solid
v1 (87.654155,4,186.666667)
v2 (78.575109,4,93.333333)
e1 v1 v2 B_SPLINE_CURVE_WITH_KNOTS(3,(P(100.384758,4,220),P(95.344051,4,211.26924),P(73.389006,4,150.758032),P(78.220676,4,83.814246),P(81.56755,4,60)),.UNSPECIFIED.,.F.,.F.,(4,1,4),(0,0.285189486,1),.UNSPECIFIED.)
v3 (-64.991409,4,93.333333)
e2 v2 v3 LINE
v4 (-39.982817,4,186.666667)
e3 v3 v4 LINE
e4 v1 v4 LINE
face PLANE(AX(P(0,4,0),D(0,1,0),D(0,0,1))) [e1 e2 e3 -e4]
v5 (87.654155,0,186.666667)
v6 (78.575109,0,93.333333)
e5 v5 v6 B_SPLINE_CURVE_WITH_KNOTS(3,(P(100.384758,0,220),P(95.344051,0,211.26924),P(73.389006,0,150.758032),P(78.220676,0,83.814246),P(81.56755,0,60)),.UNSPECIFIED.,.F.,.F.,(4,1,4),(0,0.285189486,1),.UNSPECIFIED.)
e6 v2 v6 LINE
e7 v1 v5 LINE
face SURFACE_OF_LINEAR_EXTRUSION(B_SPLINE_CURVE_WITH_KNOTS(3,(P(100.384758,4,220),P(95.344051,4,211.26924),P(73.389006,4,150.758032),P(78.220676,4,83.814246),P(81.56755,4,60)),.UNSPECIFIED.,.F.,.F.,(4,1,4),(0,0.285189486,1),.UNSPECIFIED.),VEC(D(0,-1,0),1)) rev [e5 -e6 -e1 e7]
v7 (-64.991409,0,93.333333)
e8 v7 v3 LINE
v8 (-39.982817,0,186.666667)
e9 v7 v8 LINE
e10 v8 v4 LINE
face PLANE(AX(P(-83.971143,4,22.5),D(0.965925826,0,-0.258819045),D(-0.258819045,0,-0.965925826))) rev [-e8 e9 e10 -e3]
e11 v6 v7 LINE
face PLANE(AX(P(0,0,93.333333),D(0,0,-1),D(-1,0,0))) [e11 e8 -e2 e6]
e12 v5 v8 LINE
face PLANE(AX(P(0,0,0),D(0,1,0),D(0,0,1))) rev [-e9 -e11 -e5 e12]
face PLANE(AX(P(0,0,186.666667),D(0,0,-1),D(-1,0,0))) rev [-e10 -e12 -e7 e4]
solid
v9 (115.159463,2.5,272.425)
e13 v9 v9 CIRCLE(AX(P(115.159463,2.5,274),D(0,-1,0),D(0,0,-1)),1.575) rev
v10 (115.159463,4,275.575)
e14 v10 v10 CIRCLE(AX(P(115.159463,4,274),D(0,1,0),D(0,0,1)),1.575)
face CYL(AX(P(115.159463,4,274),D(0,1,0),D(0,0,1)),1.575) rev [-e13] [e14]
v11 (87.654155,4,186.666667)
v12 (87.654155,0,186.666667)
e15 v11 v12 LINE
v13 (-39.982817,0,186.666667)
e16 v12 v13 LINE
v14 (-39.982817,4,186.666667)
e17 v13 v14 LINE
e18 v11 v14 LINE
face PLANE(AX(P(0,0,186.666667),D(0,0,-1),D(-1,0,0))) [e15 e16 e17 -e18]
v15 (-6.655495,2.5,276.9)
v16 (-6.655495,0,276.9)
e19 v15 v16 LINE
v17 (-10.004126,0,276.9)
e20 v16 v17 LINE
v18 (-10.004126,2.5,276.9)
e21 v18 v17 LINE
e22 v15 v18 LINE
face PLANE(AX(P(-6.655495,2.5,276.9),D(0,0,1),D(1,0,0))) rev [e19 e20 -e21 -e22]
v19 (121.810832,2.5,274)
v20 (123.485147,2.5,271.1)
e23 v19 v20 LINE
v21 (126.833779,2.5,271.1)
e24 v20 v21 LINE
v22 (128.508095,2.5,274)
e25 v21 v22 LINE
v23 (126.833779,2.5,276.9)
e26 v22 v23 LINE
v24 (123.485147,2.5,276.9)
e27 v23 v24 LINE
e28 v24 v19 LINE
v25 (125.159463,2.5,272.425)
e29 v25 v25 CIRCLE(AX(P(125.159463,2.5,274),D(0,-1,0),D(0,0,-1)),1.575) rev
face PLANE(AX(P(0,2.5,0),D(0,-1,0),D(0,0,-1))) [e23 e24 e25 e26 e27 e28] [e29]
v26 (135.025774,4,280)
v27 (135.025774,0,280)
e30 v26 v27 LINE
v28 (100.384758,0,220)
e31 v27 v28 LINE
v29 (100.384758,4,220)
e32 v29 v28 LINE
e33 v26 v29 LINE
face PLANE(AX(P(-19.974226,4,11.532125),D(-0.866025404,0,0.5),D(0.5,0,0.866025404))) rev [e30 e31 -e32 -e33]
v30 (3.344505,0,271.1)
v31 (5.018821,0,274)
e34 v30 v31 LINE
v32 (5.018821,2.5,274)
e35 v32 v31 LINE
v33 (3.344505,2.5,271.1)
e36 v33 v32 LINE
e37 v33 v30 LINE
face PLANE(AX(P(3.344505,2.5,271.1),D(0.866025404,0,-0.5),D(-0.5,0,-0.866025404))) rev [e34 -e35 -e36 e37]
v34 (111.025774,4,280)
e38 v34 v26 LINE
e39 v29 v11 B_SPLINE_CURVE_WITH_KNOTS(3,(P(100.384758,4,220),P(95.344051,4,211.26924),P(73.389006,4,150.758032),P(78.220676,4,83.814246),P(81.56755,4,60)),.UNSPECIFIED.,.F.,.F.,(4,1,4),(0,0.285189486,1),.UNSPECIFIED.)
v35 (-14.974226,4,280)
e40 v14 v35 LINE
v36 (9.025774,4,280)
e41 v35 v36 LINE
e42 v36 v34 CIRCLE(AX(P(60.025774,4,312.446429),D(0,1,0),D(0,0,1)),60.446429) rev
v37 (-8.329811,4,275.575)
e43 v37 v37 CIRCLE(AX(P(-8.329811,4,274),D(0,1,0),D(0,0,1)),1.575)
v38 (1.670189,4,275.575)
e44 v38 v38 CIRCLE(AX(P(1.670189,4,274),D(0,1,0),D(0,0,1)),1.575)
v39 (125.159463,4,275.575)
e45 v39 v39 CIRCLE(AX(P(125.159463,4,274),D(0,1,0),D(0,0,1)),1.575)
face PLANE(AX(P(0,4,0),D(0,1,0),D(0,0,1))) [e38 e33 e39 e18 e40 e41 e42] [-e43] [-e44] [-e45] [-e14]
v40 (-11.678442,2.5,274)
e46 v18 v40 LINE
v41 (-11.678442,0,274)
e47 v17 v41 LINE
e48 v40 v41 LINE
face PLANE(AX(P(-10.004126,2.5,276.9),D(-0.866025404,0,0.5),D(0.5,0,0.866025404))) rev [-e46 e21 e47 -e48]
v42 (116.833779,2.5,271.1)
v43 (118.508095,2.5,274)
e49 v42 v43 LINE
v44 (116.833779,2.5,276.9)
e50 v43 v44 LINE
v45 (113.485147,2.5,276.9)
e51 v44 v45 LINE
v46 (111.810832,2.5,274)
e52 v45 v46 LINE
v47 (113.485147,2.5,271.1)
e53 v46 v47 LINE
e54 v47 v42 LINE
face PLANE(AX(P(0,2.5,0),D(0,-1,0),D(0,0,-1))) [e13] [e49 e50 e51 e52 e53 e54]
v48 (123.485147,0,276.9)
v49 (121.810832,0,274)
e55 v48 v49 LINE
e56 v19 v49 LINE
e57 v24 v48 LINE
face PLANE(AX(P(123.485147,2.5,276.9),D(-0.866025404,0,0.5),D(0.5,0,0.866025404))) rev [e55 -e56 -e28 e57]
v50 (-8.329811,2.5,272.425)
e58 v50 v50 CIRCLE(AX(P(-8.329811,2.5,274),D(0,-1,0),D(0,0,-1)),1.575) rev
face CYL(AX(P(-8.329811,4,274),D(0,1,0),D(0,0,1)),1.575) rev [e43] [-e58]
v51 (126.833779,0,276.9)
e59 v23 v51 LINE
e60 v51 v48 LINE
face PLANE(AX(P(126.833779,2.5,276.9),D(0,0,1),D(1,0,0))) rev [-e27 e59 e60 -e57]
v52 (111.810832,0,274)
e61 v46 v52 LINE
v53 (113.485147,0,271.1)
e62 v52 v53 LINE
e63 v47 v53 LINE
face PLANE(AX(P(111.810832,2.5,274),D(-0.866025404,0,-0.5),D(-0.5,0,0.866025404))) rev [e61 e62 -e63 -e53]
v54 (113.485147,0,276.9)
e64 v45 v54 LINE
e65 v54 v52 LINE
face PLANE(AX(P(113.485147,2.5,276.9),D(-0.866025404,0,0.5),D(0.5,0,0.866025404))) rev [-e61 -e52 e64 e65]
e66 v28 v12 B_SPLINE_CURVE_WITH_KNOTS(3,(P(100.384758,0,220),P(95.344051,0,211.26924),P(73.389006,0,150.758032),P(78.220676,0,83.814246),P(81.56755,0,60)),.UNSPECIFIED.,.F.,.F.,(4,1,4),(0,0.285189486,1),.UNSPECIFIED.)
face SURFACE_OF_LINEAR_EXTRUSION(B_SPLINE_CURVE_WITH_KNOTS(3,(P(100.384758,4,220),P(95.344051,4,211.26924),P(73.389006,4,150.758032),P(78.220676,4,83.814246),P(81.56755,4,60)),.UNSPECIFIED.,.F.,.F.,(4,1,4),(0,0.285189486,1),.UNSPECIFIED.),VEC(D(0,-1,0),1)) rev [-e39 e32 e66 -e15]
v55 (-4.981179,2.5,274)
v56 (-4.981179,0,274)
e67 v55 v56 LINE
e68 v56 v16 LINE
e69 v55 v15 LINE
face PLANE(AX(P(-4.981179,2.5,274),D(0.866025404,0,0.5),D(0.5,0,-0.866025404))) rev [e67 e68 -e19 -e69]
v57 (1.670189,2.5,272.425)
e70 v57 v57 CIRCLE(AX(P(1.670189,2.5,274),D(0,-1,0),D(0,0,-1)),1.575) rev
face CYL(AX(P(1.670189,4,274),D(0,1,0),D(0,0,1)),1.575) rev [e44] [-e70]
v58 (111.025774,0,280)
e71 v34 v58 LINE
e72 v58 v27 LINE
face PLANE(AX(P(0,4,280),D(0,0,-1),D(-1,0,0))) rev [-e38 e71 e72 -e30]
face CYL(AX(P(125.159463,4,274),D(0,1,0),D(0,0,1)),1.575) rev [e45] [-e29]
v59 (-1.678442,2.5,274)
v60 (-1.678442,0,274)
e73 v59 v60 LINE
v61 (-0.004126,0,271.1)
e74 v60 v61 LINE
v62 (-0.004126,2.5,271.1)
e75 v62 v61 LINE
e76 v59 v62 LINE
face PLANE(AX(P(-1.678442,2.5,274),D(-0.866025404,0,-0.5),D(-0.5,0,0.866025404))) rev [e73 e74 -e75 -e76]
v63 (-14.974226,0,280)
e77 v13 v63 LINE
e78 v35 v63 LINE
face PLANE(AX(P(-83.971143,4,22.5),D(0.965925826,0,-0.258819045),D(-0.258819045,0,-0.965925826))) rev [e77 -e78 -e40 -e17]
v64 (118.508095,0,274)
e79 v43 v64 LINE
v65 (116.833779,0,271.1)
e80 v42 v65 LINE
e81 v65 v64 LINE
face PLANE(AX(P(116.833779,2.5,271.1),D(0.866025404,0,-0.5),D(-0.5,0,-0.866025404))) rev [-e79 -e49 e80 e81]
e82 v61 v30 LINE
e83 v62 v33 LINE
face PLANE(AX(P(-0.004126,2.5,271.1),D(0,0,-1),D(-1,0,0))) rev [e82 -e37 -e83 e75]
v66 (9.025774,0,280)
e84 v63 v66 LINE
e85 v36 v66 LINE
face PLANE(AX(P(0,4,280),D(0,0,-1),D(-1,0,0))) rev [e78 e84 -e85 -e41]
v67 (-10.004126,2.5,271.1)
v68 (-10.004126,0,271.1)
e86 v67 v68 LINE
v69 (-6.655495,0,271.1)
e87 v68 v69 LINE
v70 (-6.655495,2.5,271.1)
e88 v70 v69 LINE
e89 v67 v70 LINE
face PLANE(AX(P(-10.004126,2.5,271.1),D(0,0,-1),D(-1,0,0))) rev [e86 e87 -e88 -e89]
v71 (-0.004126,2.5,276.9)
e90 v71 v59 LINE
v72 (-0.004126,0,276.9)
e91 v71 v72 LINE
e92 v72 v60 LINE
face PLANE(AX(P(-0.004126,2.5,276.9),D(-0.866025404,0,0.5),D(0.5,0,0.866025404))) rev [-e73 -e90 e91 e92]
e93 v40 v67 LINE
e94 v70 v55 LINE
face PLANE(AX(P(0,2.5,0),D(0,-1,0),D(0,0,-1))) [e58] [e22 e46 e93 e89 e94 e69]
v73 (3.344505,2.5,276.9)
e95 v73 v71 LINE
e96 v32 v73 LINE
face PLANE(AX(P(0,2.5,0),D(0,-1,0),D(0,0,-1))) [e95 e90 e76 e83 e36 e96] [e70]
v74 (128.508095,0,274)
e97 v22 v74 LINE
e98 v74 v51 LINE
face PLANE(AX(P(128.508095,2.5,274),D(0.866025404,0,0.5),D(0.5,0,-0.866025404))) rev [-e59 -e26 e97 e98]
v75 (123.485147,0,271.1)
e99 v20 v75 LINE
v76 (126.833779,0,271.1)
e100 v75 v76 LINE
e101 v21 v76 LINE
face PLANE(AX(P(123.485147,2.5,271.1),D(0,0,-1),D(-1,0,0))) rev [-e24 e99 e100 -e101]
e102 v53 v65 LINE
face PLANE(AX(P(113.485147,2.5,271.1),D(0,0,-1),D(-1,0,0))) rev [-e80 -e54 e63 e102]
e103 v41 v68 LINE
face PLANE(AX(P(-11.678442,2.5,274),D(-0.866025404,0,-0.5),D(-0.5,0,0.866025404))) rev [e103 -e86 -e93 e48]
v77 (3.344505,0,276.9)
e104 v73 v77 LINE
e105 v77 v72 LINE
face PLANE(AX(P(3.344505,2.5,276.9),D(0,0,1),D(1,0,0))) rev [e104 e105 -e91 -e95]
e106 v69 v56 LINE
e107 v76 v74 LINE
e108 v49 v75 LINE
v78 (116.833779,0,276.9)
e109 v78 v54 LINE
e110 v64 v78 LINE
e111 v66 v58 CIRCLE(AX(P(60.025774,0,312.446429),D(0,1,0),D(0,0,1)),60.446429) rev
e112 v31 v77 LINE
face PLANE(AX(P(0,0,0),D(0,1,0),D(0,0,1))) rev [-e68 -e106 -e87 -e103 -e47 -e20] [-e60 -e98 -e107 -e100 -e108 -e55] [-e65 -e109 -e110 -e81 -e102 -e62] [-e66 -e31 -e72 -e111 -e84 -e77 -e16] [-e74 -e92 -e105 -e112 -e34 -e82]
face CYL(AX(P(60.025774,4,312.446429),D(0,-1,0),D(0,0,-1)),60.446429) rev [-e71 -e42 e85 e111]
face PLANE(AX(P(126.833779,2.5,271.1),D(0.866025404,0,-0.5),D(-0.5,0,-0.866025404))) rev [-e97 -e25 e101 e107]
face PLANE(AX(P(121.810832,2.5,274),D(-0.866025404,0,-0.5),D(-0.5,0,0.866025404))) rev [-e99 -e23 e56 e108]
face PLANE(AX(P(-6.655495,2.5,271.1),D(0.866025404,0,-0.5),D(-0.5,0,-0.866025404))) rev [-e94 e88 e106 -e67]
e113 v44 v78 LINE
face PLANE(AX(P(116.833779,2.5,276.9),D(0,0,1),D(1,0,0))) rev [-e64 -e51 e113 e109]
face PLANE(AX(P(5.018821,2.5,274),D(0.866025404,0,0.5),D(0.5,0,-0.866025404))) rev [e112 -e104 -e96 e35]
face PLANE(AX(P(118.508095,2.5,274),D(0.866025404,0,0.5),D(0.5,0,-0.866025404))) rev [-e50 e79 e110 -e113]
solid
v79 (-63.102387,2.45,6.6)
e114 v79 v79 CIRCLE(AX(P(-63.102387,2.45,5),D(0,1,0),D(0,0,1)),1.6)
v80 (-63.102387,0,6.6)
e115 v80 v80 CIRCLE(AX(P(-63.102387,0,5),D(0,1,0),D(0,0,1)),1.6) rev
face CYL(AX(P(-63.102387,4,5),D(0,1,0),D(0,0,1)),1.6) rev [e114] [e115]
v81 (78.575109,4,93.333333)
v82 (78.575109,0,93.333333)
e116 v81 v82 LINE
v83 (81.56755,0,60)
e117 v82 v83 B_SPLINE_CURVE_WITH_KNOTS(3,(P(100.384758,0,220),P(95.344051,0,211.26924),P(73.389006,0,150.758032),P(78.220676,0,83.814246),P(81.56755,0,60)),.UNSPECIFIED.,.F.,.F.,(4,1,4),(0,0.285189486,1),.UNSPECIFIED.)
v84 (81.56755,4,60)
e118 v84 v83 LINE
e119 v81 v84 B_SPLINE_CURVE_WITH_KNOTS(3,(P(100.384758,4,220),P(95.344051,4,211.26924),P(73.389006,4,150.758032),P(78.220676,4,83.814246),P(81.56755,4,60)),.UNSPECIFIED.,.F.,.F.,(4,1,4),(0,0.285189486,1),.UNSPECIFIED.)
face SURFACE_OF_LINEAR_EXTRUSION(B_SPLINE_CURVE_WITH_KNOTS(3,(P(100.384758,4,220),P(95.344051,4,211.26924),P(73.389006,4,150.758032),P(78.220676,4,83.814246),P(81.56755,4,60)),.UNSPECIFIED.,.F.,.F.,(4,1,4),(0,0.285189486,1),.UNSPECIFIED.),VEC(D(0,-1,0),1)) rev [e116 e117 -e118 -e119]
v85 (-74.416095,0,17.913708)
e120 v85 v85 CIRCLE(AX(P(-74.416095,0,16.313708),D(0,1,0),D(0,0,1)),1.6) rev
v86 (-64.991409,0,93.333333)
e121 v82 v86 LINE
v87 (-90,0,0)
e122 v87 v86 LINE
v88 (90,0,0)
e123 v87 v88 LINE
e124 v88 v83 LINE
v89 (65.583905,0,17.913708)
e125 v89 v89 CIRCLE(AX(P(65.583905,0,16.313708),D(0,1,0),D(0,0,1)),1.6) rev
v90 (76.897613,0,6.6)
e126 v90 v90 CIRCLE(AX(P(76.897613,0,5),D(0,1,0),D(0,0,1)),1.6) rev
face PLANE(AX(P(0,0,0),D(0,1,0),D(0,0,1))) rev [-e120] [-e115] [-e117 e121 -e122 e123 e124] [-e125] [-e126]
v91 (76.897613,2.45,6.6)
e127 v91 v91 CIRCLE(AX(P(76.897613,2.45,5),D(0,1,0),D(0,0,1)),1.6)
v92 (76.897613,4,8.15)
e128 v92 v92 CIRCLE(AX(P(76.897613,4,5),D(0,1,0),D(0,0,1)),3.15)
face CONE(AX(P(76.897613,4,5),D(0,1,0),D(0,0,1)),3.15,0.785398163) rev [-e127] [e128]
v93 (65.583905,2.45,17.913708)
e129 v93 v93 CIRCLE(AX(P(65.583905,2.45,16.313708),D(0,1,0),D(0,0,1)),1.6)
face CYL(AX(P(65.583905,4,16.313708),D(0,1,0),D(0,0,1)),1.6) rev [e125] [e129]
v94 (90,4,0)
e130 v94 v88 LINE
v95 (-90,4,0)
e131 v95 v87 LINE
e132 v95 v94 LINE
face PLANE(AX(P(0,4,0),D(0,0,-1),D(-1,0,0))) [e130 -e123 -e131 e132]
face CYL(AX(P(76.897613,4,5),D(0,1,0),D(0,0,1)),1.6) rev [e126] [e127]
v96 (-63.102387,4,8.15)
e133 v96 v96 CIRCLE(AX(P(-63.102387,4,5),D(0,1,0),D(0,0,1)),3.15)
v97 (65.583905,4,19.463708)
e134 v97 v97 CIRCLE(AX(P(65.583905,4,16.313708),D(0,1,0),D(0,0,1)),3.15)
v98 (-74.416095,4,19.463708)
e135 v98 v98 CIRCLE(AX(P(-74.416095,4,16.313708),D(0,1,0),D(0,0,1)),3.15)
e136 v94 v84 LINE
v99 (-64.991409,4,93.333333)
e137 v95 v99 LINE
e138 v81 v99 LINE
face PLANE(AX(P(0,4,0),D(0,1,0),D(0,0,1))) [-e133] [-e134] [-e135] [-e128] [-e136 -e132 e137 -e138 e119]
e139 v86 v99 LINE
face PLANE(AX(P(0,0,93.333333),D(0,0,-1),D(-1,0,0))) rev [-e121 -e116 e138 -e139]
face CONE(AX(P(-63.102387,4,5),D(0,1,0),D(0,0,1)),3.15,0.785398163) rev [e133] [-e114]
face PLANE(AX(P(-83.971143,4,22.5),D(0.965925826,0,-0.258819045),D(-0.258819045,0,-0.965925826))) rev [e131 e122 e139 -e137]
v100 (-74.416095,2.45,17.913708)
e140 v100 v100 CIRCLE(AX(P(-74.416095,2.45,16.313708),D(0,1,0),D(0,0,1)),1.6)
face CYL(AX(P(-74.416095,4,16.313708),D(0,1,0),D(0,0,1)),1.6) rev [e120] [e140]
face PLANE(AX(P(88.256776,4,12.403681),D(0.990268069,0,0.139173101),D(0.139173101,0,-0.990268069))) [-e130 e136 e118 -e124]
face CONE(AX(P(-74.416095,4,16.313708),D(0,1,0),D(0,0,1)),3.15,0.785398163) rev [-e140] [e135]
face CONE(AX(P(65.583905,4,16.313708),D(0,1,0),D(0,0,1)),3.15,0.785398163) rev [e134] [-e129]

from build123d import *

# Parameters (mm, degrees)
BOSS_EXTRUDE1_DEPTH                             = 4
CSK_FOR_M3_FLAT_HEAD_MACHINE_SCREW1_D           = 3.2
CSK_FOR_M3_FLAT_HEAD_MACHINE_SCREW1_CSINK_D     = 6.3
CSK_FOR_M3_FLAT_HEAD_MACHINE_SCREW1_CSINK_ANGLE = 90
TAP_DRILL_FOR_M3_HELICOIL1_D                    = 3.15
CUT_EXTRUDE2_DEPTH                              = 2.5
SPLIT1_OUTLINE_W                                = 182
SPLIT1_OUTLINE_H                                = 4
SPLIT1_DEPTH                                    = 186.66666666
SPLIT1_2_OUTLINE_R                              = 1.6
SPLIT1_2_DEPTH                                  = 2.4499999
SPLIT1_START                                    = 2.4499999
SPLIT1_3_DEPTH                                  = 1.5500001
SPLIT1_8_DEPTH                                  = 4


with BuildPart() as part:
    # Sketch1 → Boss-Extrude1 (new body)
    with BuildSketch(Plane(origin=(0, 0, 0), x_dir=(1, 0, 0), z_dir=(0, 1, 0))):
        with BuildLine():
            Line((81.567549918, -60), (90, 0))
            Line((90, 0), (-90, 0))
            Line((-90, 0), (-14.974226119, -280))
            Line((-14.974226119, -280), (9.025773881, -280))
            ThreePointArc((9.025773881, -280), (60.025773881, -252), (111.025773881, -280))
            Line((111.025773881, -280), (135.025773881, -280))
            Line((135.025773881, -280), (100.384757729, -220))
            add(Edge.make_bspline(
                [(100.384757729, -220), (95.344051169, -211.269240132), (73.389005734, -150.758031654), (78.220675853, -83.814246385), (81.567549918, -60)],
                knots=[0, 0, 0, 0, 0.285189486, 1, 1, 1, 1], degree=3))
        make_face()
    extrude(amount=BOSS_EXTRUDE1_DEPTH)

    # CSK for M3 Flat Head Machine Screw1 (through all)
    with Locations(Plane(origin=(0, 4, 0), x_dir=(1, 0, 0), z_dir=(0, 1, 0))):
        with Locations((-74.416095469, -16.313708499), (-63.10238697, -5), (65.583904531, -16.313708499), (76.89761303, -5)):
            CounterSinkHole(CSK_FOR_M3_FLAT_HEAD_MACHINE_SCREW1_D / 2, CSK_FOR_M3_FLAT_HEAD_MACHINE_SCREW1_CSINK_D / 2, counter_sink_angle=CSK_FOR_M3_FLAT_HEAD_MACHINE_SCREW1_CSINK_ANGLE)

    # Tap Drill for M3 Helicoil1 (through all)
    with Locations(Plane(origin=(0, 4, 0), x_dir=(1, 0, 0), z_dir=(0, 1, 0))):
        with Locations((-8.329810717, -274), (1.670189283, -274), (125.15946328, -274), (115.15946328, -274)):
            Hole(TAP_DRILL_FOR_M3_HELICOIL1_D / 2)

    # Sketch13 → Cut-Extrude2 (cut)
    with BuildSketch(Plane(origin=(0, 0, 0), x_dir=(-1, 0, 0), z_dir=(0, -1, 0))):
        Polygon((-113.485147499, -276.9), (-111.810831718, -274), (-113.485147499, -271.1), (-116.83377906, -271.1), (-118.508094841, -274), (-116.83377906, -276.9), align=None)
        Polygon((-123.485147499, -276.9), (-121.810831718, -274), (-123.485147499, -271.1), (-126.83377906, -271.1), (-128.508094841, -274), (-126.83377906, -276.9), align=None)
        Polygon((10.004126498, -276.9), (11.678442278, -274), (10.004126498, -271.1), (6.655494936, -271.1), (4.981179156, -274), (6.655494936, -276.9), align=None)
        Polygon((0.004126498, -276.9), (1.678442278, -274), (0.004126498, -271.1), (-3.344505064, -271.1), (-5.018820844, -274), (-3.344505064, -276.9), align=None)
    extrude(amount=-CUT_EXTRUDE2_DEPTH, mode=Mode.SUBTRACT)

    # Split1: read off the stored shape, not the designer's step
    # Split1 outline → Split1 (cut)
    with BuildSketch(Plane.XY):
        with Locations((0, 2)):
            Rectangle(SPLIT1_OUTLINE_W, SPLIT1_OUTLINE_H)
    extrude(amount=SPLIT1_DEPTH, mode=Mode.SUBTRACT)


with BuildPart() as body_2:
    # Split1 2 outline → Split1 2 (new body)
    with BuildSketch(Plane(origin=(0, 0, 0), x_dir=(1, 0, 0), z_dir=(0, 1, 0))):
        with BuildLine():
            Line((-64.991408707, -93.33333333), (78.575108831, -93.33333333))
            add(Edge.make_bspline(
                [(78.575108831, -93.33333333), (79.171445332, -79.99826686), (80.376266468, -68.476422189), (81.567549918, -60)],
                knots=[0.745570966, 0.745570966, 0.745570966, 0.745570966, 1, 1, 1, 1], degree=3))
            Line((81.567549918, -60), (90, 0))
            Line((90, 0), (-90, 0))
            Line((-90, 0), (-64.991408707, -93.33333333))
        make_face()
        with Locations((-74.416095469, -16.313708499)):
            Circle(SPLIT1_2_OUTLINE_R, mode=Mode.SUBTRACT)
        with Locations((-63.10238697, -5)):
            Circle(SPLIT1_2_OUTLINE_R, mode=Mode.SUBTRACT)
        with Locations((65.583904531, -16.313708499)):
            Circle(SPLIT1_2_OUTLINE_R, mode=Mode.SUBTRACT)
        with Locations((76.89761303, -5)):
            Circle(SPLIT1_2_OUTLINE_R, mode=Mode.SUBTRACT)
    extrude(amount=SPLIT1_2_DEPTH)

    # Split1 3 outline → Split1 3 (add)
    with BuildSketch(Plane(origin=(0, 0, 0), x_dir=(1, 0, 0), z_dir=(0, 1, 0)).offset(SPLIT1_START)):
        with BuildLine():
            Line((-64.991408707, -93.33333333), (78.575108831, -93.33333333))
            add(Edge.make_bspline(
                [(78.575108831, -93.33333333), (79.171445332, -79.99826686), (80.376266468, -68.476422189), (81.567549918, -60)],
                knots=[0.745570966, 0.745570966, 0.745570966, 0.745570966, 1, 1, 1, 1], degree=3))
            Line((81.567549918, -60), (90, 0))
            Line((90, 0), (-90, 0))
            Line((-90, 0), (-64.991408707, -93.33333333))
        make_face()
    extrude(amount=SPLIT1_3_DEPTH)

    # Split1 4: loft between two sections, ruled curve by curve
    split1_4_from = [
        Edge.make_three_point_arc((76.89761303, 2.45, 6.6), (78.49761303, 2.45, 5), (76.89761303, 2.45, 3.4)),
        Edge.make_three_point_arc((76.89761303, 2.45, 3.4), (75.29761303, 2.45, 5), (76.89761303, 2.45, 6.6)),
    ]
    split1_4_to = [
        Edge.make_three_point_arc((76.89761303, 4, 8.15), (80.04761303, 4, 5), (76.89761303, 4, 1.85)),
        Edge.make_three_point_arc((76.89761303, 4, 1.85), (73.74761303, 4, 5), (76.89761303, 4, 8.15)),
    ]
    split1_4 = Solid(Shell([*[Face.make_surface_from_curves(split1_4_from[k], split1_4_to[k]) for k in range(2)], Face(Wire(split1_4_from)), Face(Wire(split1_4_to))]))
    add(split1_4, mode=Mode.SUBTRACT)

    # Split1 5: loft between two sections, ruled curve by curve
    split1_5_from = [
        Edge.make_three_point_arc((65.583904531, 2.45, 17.913708499), (67.183904531, 2.45, 16.313708499), (65.583904531, 2.45, 14.713708499)),
        Edge.make_three_point_arc((65.583904531, 2.45, 14.713708499), (63.983904531, 2.45, 16.313708499), (65.583904531, 2.45, 17.913708499)),
    ]
    split1_5_to = [
        Edge.make_three_point_arc((65.583904531, 4, 19.463708499), (68.733904531, 4, 16.313708499), (65.583904531, 4, 13.163708499)),
        Edge.make_three_point_arc((65.583904531, 4, 13.163708499), (62.433904531, 4, 16.313708499), (65.583904531, 4, 19.463708499)),
    ]
    split1_5 = Solid(Shell([*[Face.make_surface_from_curves(split1_5_from[k], split1_5_to[k]) for k in range(2)], Face(Wire(split1_5_from)), Face(Wire(split1_5_to))]))
    add(split1_5, mode=Mode.SUBTRACT)

    # Split1 6: loft between two sections, ruled curve by curve
    split1_6_from = [
        Edge.make_three_point_arc((-63.10238697, 2.45, 6.6), (-61.50238697, 2.45, 5), (-63.10238697, 2.45, 3.4)),
        Edge.make_three_point_arc((-63.10238697, 2.45, 3.4), (-64.70238697, 2.45, 5), (-63.10238697, 2.45, 6.6)),
    ]
    split1_6_to = [
        Edge.make_three_point_arc((-63.10238697, 4, 8.15), (-59.95238697, 4, 5), (-63.10238697, 4, 1.85)),
        Edge.make_three_point_arc((-63.10238697, 4, 1.85), (-66.25238697, 4, 5), (-63.10238697, 4, 8.15)),
    ]
    split1_6 = Solid(Shell([*[Face.make_surface_from_curves(split1_6_from[k], split1_6_to[k]) for k in range(2)], Face(Wire(split1_6_from)), Face(Wire(split1_6_to))]))
    add(split1_6, mode=Mode.SUBTRACT)

    # Split1 7: loft between two sections, ruled curve by curve
    split1_7_from = [
        Edge.make_three_point_arc((-74.416095469, 2.45, 17.913708499), (-72.816095469, 2.45, 16.313708499), (-74.416095469, 2.45, 14.713708499)),
        Edge.make_three_point_arc((-74.416095469, 2.45, 14.713708499), (-76.016095469, 2.45, 16.313708499), (-74.416095469, 2.45, 17.913708499)),
    ]
    split1_7_to = [
        Edge.make_three_point_arc((-74.416095469, 4, 19.463708499), (-71.266095469, 4, 16.313708499), (-74.416095469, 4, 13.163708499)),
        Edge.make_three_point_arc((-74.416095469, 4, 13.163708499), (-77.566095469, 4, 16.313708499), (-74.416095469, 4, 19.463708499)),
    ]
    split1_7 = Solid(Shell([*[Face.make_surface_from_curves(split1_7_from[k], split1_7_to[k]) for k in range(2)], Face(Wire(split1_7_from)), Face(Wire(split1_7_to))]))
    add(split1_7, mode=Mode.SUBTRACT)


with BuildPart() as body_3:
    # Split1 8 outline → Split1 8 (new body)
    with BuildSketch(Plane(origin=(0, 0, 0), x_dir=(1, 0, 0), z_dir=(0, 1, 0))):
        with BuildLine():
            Line((-39.982817415, -186.66666666), (87.654154717, -186.66666666))
            add(Edge.make_bspline(
                [(87.654154717, -186.66666666), (86.701649765, -183.250236687), (78.52127075, -151.215603108), (77.496056347, -117.462724315), (78.575108831, -93.33333333)],
                knots=[0.228738149, 0.228738149, 0.228738149, 0.228738149, 0.285189486, 0.745570966, 0.745570966, 0.745570966, 0.745570966], degree=3))
            Line((78.575108831, -93.33333333), (-64.991408707, -93.33333333))
            Line((-64.991408707, -93.33333333), (-39.982817415, -186.66666666))
        make_face()
    extrude(amount=SPLIT1_8_DEPTH)


solid = Compound([part.part, body_2.part, body_3.part])
